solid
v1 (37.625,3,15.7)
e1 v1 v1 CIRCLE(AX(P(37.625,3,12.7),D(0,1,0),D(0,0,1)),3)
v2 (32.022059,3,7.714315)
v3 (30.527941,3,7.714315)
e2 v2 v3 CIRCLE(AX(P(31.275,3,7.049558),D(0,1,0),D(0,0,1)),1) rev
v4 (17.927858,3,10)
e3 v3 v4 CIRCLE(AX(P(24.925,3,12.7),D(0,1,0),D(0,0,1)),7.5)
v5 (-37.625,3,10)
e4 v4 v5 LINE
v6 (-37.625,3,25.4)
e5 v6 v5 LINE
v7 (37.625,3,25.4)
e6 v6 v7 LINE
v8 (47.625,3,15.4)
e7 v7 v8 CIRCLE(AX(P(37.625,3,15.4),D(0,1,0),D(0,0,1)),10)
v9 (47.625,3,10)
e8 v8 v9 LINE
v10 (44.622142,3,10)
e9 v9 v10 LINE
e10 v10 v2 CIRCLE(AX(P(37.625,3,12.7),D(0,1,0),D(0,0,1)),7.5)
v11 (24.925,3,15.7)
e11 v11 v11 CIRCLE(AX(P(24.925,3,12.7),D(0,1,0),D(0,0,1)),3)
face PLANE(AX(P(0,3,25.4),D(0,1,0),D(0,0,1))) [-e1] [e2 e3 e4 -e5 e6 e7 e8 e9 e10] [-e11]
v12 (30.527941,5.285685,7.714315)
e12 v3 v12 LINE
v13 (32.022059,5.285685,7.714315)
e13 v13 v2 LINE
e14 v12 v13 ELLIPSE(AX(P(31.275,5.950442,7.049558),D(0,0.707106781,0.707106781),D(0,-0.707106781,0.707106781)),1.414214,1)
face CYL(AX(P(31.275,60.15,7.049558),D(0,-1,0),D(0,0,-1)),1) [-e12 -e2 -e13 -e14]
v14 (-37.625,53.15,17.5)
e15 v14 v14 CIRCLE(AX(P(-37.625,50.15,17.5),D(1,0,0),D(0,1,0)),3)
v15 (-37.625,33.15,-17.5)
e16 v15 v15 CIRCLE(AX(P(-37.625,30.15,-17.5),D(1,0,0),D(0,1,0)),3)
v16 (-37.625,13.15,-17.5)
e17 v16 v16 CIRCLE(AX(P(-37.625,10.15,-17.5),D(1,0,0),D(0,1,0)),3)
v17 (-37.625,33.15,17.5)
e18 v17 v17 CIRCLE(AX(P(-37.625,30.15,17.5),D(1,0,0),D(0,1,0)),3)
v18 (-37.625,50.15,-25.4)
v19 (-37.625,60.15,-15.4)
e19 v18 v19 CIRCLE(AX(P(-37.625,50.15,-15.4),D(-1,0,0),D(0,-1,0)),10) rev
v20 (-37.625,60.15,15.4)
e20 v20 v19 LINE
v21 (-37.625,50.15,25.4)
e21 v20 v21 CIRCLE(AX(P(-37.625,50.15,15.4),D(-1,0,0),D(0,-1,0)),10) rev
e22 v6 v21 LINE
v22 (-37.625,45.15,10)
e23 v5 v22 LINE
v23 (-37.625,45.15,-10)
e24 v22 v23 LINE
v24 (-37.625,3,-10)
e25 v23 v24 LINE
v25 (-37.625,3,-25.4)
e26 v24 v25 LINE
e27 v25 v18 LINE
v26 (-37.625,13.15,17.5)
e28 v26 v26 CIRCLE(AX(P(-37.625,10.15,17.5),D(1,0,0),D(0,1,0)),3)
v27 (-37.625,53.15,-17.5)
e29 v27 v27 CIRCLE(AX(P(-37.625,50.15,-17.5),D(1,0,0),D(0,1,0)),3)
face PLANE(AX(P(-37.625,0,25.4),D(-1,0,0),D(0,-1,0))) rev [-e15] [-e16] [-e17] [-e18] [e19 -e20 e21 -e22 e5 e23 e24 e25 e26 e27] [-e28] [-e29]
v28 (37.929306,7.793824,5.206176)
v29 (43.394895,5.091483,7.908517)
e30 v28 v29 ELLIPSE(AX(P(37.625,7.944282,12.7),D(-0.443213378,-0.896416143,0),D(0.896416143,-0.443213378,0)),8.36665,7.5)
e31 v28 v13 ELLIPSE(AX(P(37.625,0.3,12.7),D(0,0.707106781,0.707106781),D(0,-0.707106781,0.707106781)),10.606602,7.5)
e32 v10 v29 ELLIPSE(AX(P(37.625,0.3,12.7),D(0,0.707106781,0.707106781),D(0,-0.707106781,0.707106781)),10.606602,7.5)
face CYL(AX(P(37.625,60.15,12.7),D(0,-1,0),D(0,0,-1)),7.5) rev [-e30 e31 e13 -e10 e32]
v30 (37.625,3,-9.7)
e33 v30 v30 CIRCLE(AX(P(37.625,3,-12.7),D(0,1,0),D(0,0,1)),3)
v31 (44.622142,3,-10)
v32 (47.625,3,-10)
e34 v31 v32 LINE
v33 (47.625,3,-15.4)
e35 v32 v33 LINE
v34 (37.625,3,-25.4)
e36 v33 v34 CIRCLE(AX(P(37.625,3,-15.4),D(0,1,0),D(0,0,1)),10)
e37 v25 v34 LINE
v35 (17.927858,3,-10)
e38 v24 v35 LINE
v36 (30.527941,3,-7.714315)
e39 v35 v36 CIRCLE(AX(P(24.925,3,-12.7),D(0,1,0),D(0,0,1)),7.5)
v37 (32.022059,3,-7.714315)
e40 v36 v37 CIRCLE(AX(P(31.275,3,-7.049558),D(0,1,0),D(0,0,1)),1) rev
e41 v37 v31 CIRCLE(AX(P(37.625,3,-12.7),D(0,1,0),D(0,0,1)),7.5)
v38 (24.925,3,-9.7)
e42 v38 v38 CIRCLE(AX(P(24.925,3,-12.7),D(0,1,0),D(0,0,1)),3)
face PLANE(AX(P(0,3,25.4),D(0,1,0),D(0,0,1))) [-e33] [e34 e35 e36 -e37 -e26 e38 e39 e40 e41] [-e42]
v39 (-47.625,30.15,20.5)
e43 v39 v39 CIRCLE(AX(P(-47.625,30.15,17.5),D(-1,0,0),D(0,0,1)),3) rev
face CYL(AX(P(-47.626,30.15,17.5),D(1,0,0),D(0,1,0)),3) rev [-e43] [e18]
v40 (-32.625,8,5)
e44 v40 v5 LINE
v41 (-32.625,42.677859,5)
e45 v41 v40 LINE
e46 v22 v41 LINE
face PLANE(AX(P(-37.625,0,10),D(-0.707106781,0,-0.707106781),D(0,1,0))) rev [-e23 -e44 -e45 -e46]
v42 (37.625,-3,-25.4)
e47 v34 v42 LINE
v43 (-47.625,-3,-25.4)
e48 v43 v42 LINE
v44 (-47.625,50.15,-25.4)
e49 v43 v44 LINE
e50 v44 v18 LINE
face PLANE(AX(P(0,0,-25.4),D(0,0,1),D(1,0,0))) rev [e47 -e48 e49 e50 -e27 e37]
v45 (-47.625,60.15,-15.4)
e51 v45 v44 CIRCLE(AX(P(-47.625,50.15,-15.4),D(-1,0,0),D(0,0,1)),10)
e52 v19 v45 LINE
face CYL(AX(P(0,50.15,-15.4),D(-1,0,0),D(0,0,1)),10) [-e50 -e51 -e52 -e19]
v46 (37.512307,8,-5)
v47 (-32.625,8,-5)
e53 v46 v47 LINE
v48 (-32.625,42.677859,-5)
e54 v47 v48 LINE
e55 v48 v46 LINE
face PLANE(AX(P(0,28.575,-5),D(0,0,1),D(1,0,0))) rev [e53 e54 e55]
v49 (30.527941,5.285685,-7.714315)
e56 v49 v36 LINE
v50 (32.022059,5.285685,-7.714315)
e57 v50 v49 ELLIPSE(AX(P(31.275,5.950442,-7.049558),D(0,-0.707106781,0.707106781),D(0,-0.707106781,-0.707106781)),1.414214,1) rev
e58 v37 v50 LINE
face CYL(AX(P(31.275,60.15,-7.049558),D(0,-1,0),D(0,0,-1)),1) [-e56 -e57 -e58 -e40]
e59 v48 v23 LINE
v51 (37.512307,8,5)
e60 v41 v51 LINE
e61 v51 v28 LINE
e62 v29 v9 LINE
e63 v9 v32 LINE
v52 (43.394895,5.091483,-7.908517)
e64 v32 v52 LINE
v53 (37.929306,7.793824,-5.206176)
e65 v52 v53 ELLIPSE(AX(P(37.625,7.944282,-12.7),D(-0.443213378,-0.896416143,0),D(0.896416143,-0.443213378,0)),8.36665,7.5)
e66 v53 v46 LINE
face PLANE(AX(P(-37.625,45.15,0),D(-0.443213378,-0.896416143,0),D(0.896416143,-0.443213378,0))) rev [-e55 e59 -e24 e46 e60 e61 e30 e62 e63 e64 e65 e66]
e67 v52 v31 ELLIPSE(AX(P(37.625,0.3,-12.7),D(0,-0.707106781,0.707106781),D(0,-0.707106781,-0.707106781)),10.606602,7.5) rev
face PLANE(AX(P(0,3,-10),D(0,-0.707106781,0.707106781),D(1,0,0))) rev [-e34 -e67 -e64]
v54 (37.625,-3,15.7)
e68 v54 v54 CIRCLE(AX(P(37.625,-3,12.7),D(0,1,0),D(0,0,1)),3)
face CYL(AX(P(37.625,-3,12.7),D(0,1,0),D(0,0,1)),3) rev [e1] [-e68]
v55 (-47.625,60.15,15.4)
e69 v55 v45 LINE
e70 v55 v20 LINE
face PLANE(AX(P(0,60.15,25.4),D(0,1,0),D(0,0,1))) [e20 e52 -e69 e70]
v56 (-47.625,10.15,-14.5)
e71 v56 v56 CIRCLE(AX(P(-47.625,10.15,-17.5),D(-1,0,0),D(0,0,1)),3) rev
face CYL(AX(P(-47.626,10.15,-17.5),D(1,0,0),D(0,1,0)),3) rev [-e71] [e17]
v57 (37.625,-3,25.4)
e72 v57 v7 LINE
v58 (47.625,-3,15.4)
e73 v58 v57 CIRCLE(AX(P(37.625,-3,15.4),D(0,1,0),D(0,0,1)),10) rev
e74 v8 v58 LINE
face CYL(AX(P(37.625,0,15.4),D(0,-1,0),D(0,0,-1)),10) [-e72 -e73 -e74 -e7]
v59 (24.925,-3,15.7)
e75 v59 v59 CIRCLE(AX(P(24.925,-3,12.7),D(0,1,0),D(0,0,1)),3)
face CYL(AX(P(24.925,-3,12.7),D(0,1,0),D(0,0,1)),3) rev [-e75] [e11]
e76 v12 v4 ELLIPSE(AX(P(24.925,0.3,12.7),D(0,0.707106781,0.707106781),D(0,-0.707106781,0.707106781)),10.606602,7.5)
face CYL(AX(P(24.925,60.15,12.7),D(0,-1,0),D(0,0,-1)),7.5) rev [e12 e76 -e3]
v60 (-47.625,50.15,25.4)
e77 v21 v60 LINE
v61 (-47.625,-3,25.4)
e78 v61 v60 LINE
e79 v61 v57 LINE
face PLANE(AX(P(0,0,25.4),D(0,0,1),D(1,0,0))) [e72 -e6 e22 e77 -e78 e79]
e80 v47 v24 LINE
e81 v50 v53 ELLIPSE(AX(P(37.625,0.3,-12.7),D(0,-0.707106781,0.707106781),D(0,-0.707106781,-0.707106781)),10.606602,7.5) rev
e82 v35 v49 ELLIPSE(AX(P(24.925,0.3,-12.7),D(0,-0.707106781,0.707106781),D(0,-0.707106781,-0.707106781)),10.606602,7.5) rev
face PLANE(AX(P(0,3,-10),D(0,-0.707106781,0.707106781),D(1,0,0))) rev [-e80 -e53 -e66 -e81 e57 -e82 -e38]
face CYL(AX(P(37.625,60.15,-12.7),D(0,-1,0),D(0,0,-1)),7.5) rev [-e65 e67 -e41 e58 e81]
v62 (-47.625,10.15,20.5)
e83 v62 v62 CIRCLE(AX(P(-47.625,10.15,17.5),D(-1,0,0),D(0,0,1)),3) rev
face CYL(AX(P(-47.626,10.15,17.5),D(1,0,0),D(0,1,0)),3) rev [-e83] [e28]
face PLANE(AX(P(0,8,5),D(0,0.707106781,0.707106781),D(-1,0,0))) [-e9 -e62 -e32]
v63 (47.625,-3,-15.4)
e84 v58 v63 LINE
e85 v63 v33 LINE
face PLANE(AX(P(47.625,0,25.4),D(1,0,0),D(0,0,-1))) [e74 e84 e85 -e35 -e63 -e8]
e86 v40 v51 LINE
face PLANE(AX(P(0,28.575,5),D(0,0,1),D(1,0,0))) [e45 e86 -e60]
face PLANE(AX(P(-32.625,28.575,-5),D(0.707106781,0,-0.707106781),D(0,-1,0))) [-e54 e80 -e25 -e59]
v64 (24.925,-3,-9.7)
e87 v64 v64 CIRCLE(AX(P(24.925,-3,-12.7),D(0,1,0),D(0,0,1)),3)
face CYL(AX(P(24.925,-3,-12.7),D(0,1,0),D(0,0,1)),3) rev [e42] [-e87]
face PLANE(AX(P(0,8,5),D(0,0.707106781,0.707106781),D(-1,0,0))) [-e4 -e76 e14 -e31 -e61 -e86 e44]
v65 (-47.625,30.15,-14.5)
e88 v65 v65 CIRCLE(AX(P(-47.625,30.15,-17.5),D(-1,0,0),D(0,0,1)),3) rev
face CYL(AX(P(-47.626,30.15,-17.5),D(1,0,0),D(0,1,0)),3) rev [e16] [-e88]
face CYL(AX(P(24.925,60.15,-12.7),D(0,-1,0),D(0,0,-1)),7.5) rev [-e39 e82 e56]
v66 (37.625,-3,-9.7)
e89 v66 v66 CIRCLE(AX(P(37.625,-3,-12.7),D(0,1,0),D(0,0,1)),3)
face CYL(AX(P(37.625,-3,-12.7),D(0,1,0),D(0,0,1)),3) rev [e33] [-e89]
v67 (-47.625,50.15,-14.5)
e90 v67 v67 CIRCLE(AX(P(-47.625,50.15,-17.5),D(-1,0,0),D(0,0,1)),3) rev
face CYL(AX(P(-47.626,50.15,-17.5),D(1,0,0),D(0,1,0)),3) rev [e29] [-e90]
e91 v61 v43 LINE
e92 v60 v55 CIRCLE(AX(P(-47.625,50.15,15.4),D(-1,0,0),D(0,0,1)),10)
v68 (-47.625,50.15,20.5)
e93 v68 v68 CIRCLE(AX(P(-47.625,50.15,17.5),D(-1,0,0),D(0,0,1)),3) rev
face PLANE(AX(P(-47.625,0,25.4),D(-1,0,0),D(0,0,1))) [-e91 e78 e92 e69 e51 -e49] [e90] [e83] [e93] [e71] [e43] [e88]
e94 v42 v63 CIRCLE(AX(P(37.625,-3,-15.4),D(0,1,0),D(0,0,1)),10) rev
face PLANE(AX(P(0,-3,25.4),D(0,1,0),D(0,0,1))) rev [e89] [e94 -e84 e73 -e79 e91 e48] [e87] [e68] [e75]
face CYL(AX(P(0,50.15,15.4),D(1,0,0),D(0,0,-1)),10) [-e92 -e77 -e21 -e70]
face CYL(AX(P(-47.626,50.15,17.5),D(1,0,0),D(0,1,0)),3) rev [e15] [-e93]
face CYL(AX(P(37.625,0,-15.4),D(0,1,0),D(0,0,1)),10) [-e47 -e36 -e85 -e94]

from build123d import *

# Parameters (mm, degrees)
SKETCH1_W               = 10
SKETCH1_H               = 57.15
SKETCH1_W_2             = 95.25
SKETCH1_H_2             = 6
BOSS_EXTRUDE1_DEPTH     = 25.4
RIB1_REACH              = 82.817
SKETCH2_WALL_W          = 258.734123662
SKETCH2_WALL_H          = 10
CHAMFER2_SIZE           = 5
CHAMFER3_SIZE           = 5
CUT_EXTRUDE1_DEPTH      = 79.60930686
CUT_EXTRUDE1_DEPTH_BACK = 79.60930686
SKETCH3_R               = 3
SKETCH4_R               = 7.5
CUT_EXTRUDE2_DEPTH      = 79.60930686
FILLET1_R               = 10
FILLET2_R               = 10
CUT_EXTRUDE3_REACH      = 109.381
SKETCH5_R               = 3
FILLET3_R               = 1


with BuildPart() as part:
    # Sketch1 → Boss-Extrude1 (new, symmetric)
    with BuildSketch(Plane.XY):
        with Locations((-42.625, 31.575)):
            Rectangle(SKETCH1_W, SKETCH1_H)
        Rectangle(SKETCH1_W_2, SKETCH1_H_2)
    extrude(amount=BOSS_EXTRUDE1_DEPTH, both=True)

    # Sketch2 wall → Rib1 (add, up to next)
    with BuildSketch(Plane(origin=(5, 24.075, 0), x_dir=(0.896416143278, -0.443213377586, 0), z_dir=(0.443213377586, 0.896416143278, 0)), mode=Mode.PRIVATE) as rib1_sk1:
        Rectangle(SKETCH2_WALL_W, SKETCH2_WALL_H)
    rib1_tool1 = extrude(rib1_sk1.sketch, amount=-RIB1_REACH, mode=Mode.PRIVATE) - part.part
    add(rib1_tool1.solids().sort_by_distance((5, 24.075, 0))[0])

    # Chamfer2
    chamfer2_edges = [part.edges().sort_by_distance(p)[0] for p in [
        (-37.625, 24.075, 5),
        (5, 3, 5),
    ]]
    chamfer(chamfer2_edges, length=CHAMFER2_SIZE)

    # Chamfer3
    # the kernel refuses this chamfer: 5 mm, written as the material it adds along each edge
    with BuildSketch(Plane(origin=(-37.625, 58.00841494, -5), x_dir=(-0.027495876610586317, 0, -0.9996219169112968), z_dir=(0, -1, 0))) as chamfer3_piece_1_section:
        Polygon((CHAMFER3_SIZE * 0.999621916911, CHAMFER3_SIZE * 0.0274958766106), (-CHAMFER3_SIZE * 0.0274958766106, CHAMFER3_SIZE * 0.999621916911), (0, 0), align=None)
    chamfer3_piece_1 = extrude(amount=55.00841494, mode=Mode.PRIVATE)
    chamfer3_piece_1 = split(chamfer3_piece_1, bisect_by=Plane(origin=(-27.763842546, 40.274366139, -6.674975075), z_dir=(-0.4432133775858684, -0.8964161432777338, 0)), keep=Keep.TOP, mode=Mode.PRIVATE)
    add(chamfer3_piece_1)
    with BuildSketch(Plane(origin=(60.48341494, 3, -5), x_dir=(0, 0.9996219169112968, 0.027495876610586244), z_dir=(-1, 0, 0))) as chamfer3_piece_2_section:
        Polygon((CHAMFER3_SIZE * 0.999621916911, CHAMFER3_SIZE * 0.0274958766106), (-CHAMFER3_SIZE * 0.0274958766106, CHAMFER3_SIZE * 0.999621916911), (0, 0), align=None)
    chamfer3_piece_2 = extrude(amount=110.96682988, mode=Mode.PRIVATE)
    chamfer3_piece_2 = split(chamfer3_piece_2, bisect_by=Plane(origin=(-47.625, 4.632358995, -6.683820502), z_dir=(1, 0, 0)), keep=Keep.TOP, mode=Mode.PRIVATE)
    chamfer3_piece_2 = split(chamfer3_piece_2, bisect_by=Plane(origin=(11.398148356, 20.911575329, -6.683820502), z_dir=(-0.4432133775858684, -0.8964161432777338, 0)), keep=Keep.TOP, mode=Mode.PRIVATE)
    add(chamfer3_piece_2)

    # Sketch3 → Cut-Extrude1 (cut, two sides: drawn at the far end of the back side and taken through both)
    with BuildSketch(Plane(origin=(0, 3, 0), x_dir=(1, 0, 0), z_dir=(0, 1, 0)).offset(-CUT_EXTRUDE1_DEPTH_BACK)):
        with Locations(Location((24.925, 12.7, 0), (0, 0, 270))):
            Circle(SKETCH3_R)
        with Locations(Location((24.925, -12.7, 0), (0, 0, 270))):
            Circle(SKETCH3_R)
        with Locations(Location((37.625, -12.7, 0), (0, 0, 270))):
            Circle(SKETCH3_R)
        with Locations(Location((37.625, 12.7, 0), (0, 0, 270))):
            Circle(SKETCH3_R)
    extrude(amount=CUT_EXTRUDE1_DEPTH + CUT_EXTRUDE1_DEPTH_BACK, mode=Mode.SUBTRACT)

    # Sketch4 → Cut-Extrude2 (cut, through all)
    with BuildSketch(Plane(origin=(0, 3, 0), x_dir=(1, 0, 0), z_dir=(0, 1, 0))):
        with BuildLine():
            ThreePointArc((31.275, -16.690927211), (39.701655966, -19.906767653), (45.125, -12.7))
            ThreePointArc((45.125, -12.7), (44.998213921, -11.326786079), (44.622142274, -10))
            Line((44.622142274, -10), (38.932669683, -10))
            ThreePointArc((38.932669683, -10), (37.625, -15.7), (36.317330317, -10))
            Line((36.317330317, -10), (31.922142274, -10))
            ThreePointArc((31.922142274, -10), (32.298213921, -11.326786079), (32.425, -12.7))
            ThreePointArc((32.425, -12.7), (32.131767653, -14.776655966), (31.275, -16.690927211))
        make_face()
        with BuildLine():
            Line((38.932669683, -10), (44.622142274, -10))
            ThreePointArc((44.622142274, -10), (38.347026001, -5.234835671), (31.275, -8.709072789))
            ThreePointArc((31.275, -8.709072789), (31.629712894, -9.338925021), (31.922142274, -10))
            Line((31.922142274, -10), (36.317330317, -10))
            ThreePointArc((36.317330317, -10), (37.625, -15.7), (38.932669683, -10))
        make_face()
        with BuildLine():
            ThreePointArc((17.927857726, -10), (21.563925021, -19.404712894), (31.275, -16.690927211))
            ThreePointArc((31.275, -16.690927211), (30.159835671, -13.422026001), (30.627857726, -10))
            Line((30.627857726, -10), (26.232669683, -10))
            ThreePointArc((26.232669683, -10), (24.925, -15.7), (23.617330317, -10))
            Line((23.617330317, -10), (17.927857726, -10))
        make_face()
        with BuildLine():
            ThreePointArc((30.627857726, -10), (30.920287106, -9.338925021), (31.275, -8.709072789))
            ThreePointArc((31.275, -8.709072789), (24.202973999, -5.234835671), (17.927857726, -10))
            Line((17.927857726, -10), (23.617330317, -10))
            ThreePointArc((23.617330317, -10), (24.925, -15.7), (26.232669683, -10))
            Line((26.232669683, -10), (30.627857726, -10))
        make_face()
        with BuildLine():
            ThreePointArc((30.627857726, -10), (30.159835671, -13.422026001), (31.275, -16.690927211))
            ThreePointArc((31.275, -16.690927211), (32.131767653, -14.776655966), (32.425, -12.7))
            ThreePointArc((32.425, -12.7), (32.298213921, -11.326786079), (31.922142274, -10))
            Line((31.922142274, -10), (30.627857726, -10))
        make_face()
        with BuildLine():
            ThreePointArc((31.922142274, -10), (31.629712894, -9.338925021), (31.275, -8.709072789))
            ThreePointArc((31.275, -8.709072789), (30.920287106, -9.338925021), (30.627857726, -10))
            Line((30.627857726, -10), (31.922142274, -10))
        make_face()
        with Locations((24.925, 12.7)):
            Circle(SKETCH4_R)
        with Locations((37.625, 12.7)):
            Circle(SKETCH4_R)
    extrude(amount=CUT_EXTRUDE2_DEPTH, mode=Mode.SUBTRACT)

    # Fillet1
    fillet1_edges = [part.edges().sort_by_distance(p)[0] for p in [
        (47.625, 0, 25.4),
        (47.625, 0, -25.4),
    ]]
    fillet(fillet1_edges, radius=FILLET1_R)

    # Fillet2
    fillet2_edges = [part.edges().sort_by_distance(p)[0] for p in [
        (-42.625, 60.15, 25.4),
        (-42.625, 60.15, -25.4),
    ]]
    fillet(fillet2_edges, radius=FILLET2_R)

    # Sketch5 → Cut-Extrude3 (cut, up to next)
    with BuildSketch(Plane(origin=(-37.625, 0, 0), x_dir=(0, 0, -1), z_dir=(1, 0, 0)), mode=Mode.PRIVATE) as cut_extrude3_sk1:
        with Locations(Location((-17.5, 50.15, 0), (0, 0, 90))):
            Circle(SKETCH5_R)
    cut_extrude3_tool1 = extrude(cut_extrude3_sk1.sketch, amount=-CUT_EXTRUDE3_REACH, mode=Mode.PRIVATE) & part.part
    # Sketch5 → Cut-Extrude3 (cut, up to next)
    with BuildSketch(Plane(origin=(-37.625, 0, 0), x_dir=(0, 0, -1), z_dir=(1, 0, 0)), mode=Mode.PRIVATE) as cut_extrude3_sk2:
        with Locations(Location((17.5, 50.15, 0), (0, 0, 90))):
            Circle(SKETCH5_R)
    cut_extrude3_tool2 = extrude(cut_extrude3_sk2.sketch, amount=-CUT_EXTRUDE3_REACH, mode=Mode.PRIVATE) & part.part
    # Sketch5 → Cut-Extrude3 (cut, up to next)
    with BuildSketch(Plane(origin=(-37.625, 0, 0), x_dir=(0, 0, -1), z_dir=(1, 0, 0)), mode=Mode.PRIVATE) as cut_extrude3_sk3:
        with Locations(Location((17.5, 30.15, 0), (0, 0, 90))):
            Circle(SKETCH5_R)
    cut_extrude3_tool3 = extrude(cut_extrude3_sk3.sketch, amount=-CUT_EXTRUDE3_REACH, mode=Mode.PRIVATE) & part.part
    # Sketch5 → Cut-Extrude3 (cut, up to next)
    with BuildSketch(Plane(origin=(-37.625, 0, 0), x_dir=(0, 0, -1), z_dir=(1, 0, 0)), mode=Mode.PRIVATE) as cut_extrude3_sk4:
        with Locations(Location((-17.5, 30.15, 0), (0, 0, 90))):
            Circle(SKETCH5_R)
    cut_extrude3_tool4 = extrude(cut_extrude3_sk4.sketch, amount=-CUT_EXTRUDE3_REACH, mode=Mode.PRIVATE) & part.part
    # Sketch5 → Cut-Extrude3 (cut, up to next)
    with BuildSketch(Plane(origin=(-37.625, 0, 0), x_dir=(0, 0, -1), z_dir=(1, 0, 0)), mode=Mode.PRIVATE) as cut_extrude3_sk5:
        with Locations(Location((-17.5, 10.15, 0), (0, 0, 90))):
            Circle(SKETCH5_R)
    cut_extrude3_tool5 = extrude(cut_extrude3_sk5.sketch, amount=-CUT_EXTRUDE3_REACH, mode=Mode.PRIVATE) & part.part
    # Sketch5 → Cut-Extrude3 (cut, up to next)
    with BuildSketch(Plane(origin=(-37.625, 0, 0), x_dir=(0, 0, -1), z_dir=(1, 0, 0)), mode=Mode.PRIVATE) as cut_extrude3_sk6:
        with Locations(Location((17.5, 10.15, 0), (0, 0, 90))):
            Circle(SKETCH5_R)
    cut_extrude3_tool6 = extrude(cut_extrude3_sk6.sketch, amount=-CUT_EXTRUDE3_REACH, mode=Mode.PRIVATE) & part.part
    add(cut_extrude3_tool1.solids().sort_by_distance((-37.625, 50.15, 17.5))[0], mode=Mode.SUBTRACT)
    add(cut_extrude3_tool2.solids().sort_by_distance((-37.625, 50.15, -17.5))[0], mode=Mode.SUBTRACT)
    add(cut_extrude3_tool3.solids().sort_by_distance((-37.625, 30.15, -17.5))[0], mode=Mode.SUBTRACT)
    add(cut_extrude3_tool4.solids().sort_by_distance((-37.625, 30.15, 17.5))[0], mode=Mode.SUBTRACT)
    add(cut_extrude3_tool5.solids().sort_by_distance((-37.625, 10.15, 17.5))[0], mode=Mode.SUBTRACT)
    add(cut_extrude3_tool6.solids().sort_by_distance((-37.625, 10.15, -17.5))[0], mode=Mode.SUBTRACT)

    # Fillet3
    # the kernel refuses this fillet: 1 mm, written as the material it takes off along each edge
    with BuildSketch(Plane(origin=(31.275, 7.401030704, -8.709072789), x_dir=(-0.6005096173498707, 0, 0.7996175332434325), z_dir=(0, -1, 0))) as fillet3_piece_1:
        with BuildLine():
            CenterArc((1.326977491, -0.996554868), FILLET3_R, 94.7573526, 96.67248475)
            ThreePointArc((0.346809381, -1.194722667), (0.198218842, -0.590158172), (0, 0))
            ThreePointArc((0, 0), (0.622020699, -0.025838492), (1.244041397, 0))
        make_face()
    extrude(amount=4.401030704, mode=Mode.SUBTRACT)
    with BuildSketch(Plane(origin=(31.275, 3, 8.709072789), x_dir=(0.6005096173499003, 0, -0.7996175332434102), z_dir=(0, 1, 0))) as fillet3_piece_2:
        with BuildLine():
            CenterArc((1.326977491, 0.996554868), FILLET3_R, 168.570162651, 96.67248475)
            ThreePointArc((0.346809381, 1.194722667), (0.198218842, 0.590158172), (0, 0))
            ThreePointArc((0, 0), (0.622020699, 0.025838492), (1.244041397, 0))
        make_face()
    extrude(amount=4.401030704, mode=Mode.SUBTRACT)


solid = part.part
